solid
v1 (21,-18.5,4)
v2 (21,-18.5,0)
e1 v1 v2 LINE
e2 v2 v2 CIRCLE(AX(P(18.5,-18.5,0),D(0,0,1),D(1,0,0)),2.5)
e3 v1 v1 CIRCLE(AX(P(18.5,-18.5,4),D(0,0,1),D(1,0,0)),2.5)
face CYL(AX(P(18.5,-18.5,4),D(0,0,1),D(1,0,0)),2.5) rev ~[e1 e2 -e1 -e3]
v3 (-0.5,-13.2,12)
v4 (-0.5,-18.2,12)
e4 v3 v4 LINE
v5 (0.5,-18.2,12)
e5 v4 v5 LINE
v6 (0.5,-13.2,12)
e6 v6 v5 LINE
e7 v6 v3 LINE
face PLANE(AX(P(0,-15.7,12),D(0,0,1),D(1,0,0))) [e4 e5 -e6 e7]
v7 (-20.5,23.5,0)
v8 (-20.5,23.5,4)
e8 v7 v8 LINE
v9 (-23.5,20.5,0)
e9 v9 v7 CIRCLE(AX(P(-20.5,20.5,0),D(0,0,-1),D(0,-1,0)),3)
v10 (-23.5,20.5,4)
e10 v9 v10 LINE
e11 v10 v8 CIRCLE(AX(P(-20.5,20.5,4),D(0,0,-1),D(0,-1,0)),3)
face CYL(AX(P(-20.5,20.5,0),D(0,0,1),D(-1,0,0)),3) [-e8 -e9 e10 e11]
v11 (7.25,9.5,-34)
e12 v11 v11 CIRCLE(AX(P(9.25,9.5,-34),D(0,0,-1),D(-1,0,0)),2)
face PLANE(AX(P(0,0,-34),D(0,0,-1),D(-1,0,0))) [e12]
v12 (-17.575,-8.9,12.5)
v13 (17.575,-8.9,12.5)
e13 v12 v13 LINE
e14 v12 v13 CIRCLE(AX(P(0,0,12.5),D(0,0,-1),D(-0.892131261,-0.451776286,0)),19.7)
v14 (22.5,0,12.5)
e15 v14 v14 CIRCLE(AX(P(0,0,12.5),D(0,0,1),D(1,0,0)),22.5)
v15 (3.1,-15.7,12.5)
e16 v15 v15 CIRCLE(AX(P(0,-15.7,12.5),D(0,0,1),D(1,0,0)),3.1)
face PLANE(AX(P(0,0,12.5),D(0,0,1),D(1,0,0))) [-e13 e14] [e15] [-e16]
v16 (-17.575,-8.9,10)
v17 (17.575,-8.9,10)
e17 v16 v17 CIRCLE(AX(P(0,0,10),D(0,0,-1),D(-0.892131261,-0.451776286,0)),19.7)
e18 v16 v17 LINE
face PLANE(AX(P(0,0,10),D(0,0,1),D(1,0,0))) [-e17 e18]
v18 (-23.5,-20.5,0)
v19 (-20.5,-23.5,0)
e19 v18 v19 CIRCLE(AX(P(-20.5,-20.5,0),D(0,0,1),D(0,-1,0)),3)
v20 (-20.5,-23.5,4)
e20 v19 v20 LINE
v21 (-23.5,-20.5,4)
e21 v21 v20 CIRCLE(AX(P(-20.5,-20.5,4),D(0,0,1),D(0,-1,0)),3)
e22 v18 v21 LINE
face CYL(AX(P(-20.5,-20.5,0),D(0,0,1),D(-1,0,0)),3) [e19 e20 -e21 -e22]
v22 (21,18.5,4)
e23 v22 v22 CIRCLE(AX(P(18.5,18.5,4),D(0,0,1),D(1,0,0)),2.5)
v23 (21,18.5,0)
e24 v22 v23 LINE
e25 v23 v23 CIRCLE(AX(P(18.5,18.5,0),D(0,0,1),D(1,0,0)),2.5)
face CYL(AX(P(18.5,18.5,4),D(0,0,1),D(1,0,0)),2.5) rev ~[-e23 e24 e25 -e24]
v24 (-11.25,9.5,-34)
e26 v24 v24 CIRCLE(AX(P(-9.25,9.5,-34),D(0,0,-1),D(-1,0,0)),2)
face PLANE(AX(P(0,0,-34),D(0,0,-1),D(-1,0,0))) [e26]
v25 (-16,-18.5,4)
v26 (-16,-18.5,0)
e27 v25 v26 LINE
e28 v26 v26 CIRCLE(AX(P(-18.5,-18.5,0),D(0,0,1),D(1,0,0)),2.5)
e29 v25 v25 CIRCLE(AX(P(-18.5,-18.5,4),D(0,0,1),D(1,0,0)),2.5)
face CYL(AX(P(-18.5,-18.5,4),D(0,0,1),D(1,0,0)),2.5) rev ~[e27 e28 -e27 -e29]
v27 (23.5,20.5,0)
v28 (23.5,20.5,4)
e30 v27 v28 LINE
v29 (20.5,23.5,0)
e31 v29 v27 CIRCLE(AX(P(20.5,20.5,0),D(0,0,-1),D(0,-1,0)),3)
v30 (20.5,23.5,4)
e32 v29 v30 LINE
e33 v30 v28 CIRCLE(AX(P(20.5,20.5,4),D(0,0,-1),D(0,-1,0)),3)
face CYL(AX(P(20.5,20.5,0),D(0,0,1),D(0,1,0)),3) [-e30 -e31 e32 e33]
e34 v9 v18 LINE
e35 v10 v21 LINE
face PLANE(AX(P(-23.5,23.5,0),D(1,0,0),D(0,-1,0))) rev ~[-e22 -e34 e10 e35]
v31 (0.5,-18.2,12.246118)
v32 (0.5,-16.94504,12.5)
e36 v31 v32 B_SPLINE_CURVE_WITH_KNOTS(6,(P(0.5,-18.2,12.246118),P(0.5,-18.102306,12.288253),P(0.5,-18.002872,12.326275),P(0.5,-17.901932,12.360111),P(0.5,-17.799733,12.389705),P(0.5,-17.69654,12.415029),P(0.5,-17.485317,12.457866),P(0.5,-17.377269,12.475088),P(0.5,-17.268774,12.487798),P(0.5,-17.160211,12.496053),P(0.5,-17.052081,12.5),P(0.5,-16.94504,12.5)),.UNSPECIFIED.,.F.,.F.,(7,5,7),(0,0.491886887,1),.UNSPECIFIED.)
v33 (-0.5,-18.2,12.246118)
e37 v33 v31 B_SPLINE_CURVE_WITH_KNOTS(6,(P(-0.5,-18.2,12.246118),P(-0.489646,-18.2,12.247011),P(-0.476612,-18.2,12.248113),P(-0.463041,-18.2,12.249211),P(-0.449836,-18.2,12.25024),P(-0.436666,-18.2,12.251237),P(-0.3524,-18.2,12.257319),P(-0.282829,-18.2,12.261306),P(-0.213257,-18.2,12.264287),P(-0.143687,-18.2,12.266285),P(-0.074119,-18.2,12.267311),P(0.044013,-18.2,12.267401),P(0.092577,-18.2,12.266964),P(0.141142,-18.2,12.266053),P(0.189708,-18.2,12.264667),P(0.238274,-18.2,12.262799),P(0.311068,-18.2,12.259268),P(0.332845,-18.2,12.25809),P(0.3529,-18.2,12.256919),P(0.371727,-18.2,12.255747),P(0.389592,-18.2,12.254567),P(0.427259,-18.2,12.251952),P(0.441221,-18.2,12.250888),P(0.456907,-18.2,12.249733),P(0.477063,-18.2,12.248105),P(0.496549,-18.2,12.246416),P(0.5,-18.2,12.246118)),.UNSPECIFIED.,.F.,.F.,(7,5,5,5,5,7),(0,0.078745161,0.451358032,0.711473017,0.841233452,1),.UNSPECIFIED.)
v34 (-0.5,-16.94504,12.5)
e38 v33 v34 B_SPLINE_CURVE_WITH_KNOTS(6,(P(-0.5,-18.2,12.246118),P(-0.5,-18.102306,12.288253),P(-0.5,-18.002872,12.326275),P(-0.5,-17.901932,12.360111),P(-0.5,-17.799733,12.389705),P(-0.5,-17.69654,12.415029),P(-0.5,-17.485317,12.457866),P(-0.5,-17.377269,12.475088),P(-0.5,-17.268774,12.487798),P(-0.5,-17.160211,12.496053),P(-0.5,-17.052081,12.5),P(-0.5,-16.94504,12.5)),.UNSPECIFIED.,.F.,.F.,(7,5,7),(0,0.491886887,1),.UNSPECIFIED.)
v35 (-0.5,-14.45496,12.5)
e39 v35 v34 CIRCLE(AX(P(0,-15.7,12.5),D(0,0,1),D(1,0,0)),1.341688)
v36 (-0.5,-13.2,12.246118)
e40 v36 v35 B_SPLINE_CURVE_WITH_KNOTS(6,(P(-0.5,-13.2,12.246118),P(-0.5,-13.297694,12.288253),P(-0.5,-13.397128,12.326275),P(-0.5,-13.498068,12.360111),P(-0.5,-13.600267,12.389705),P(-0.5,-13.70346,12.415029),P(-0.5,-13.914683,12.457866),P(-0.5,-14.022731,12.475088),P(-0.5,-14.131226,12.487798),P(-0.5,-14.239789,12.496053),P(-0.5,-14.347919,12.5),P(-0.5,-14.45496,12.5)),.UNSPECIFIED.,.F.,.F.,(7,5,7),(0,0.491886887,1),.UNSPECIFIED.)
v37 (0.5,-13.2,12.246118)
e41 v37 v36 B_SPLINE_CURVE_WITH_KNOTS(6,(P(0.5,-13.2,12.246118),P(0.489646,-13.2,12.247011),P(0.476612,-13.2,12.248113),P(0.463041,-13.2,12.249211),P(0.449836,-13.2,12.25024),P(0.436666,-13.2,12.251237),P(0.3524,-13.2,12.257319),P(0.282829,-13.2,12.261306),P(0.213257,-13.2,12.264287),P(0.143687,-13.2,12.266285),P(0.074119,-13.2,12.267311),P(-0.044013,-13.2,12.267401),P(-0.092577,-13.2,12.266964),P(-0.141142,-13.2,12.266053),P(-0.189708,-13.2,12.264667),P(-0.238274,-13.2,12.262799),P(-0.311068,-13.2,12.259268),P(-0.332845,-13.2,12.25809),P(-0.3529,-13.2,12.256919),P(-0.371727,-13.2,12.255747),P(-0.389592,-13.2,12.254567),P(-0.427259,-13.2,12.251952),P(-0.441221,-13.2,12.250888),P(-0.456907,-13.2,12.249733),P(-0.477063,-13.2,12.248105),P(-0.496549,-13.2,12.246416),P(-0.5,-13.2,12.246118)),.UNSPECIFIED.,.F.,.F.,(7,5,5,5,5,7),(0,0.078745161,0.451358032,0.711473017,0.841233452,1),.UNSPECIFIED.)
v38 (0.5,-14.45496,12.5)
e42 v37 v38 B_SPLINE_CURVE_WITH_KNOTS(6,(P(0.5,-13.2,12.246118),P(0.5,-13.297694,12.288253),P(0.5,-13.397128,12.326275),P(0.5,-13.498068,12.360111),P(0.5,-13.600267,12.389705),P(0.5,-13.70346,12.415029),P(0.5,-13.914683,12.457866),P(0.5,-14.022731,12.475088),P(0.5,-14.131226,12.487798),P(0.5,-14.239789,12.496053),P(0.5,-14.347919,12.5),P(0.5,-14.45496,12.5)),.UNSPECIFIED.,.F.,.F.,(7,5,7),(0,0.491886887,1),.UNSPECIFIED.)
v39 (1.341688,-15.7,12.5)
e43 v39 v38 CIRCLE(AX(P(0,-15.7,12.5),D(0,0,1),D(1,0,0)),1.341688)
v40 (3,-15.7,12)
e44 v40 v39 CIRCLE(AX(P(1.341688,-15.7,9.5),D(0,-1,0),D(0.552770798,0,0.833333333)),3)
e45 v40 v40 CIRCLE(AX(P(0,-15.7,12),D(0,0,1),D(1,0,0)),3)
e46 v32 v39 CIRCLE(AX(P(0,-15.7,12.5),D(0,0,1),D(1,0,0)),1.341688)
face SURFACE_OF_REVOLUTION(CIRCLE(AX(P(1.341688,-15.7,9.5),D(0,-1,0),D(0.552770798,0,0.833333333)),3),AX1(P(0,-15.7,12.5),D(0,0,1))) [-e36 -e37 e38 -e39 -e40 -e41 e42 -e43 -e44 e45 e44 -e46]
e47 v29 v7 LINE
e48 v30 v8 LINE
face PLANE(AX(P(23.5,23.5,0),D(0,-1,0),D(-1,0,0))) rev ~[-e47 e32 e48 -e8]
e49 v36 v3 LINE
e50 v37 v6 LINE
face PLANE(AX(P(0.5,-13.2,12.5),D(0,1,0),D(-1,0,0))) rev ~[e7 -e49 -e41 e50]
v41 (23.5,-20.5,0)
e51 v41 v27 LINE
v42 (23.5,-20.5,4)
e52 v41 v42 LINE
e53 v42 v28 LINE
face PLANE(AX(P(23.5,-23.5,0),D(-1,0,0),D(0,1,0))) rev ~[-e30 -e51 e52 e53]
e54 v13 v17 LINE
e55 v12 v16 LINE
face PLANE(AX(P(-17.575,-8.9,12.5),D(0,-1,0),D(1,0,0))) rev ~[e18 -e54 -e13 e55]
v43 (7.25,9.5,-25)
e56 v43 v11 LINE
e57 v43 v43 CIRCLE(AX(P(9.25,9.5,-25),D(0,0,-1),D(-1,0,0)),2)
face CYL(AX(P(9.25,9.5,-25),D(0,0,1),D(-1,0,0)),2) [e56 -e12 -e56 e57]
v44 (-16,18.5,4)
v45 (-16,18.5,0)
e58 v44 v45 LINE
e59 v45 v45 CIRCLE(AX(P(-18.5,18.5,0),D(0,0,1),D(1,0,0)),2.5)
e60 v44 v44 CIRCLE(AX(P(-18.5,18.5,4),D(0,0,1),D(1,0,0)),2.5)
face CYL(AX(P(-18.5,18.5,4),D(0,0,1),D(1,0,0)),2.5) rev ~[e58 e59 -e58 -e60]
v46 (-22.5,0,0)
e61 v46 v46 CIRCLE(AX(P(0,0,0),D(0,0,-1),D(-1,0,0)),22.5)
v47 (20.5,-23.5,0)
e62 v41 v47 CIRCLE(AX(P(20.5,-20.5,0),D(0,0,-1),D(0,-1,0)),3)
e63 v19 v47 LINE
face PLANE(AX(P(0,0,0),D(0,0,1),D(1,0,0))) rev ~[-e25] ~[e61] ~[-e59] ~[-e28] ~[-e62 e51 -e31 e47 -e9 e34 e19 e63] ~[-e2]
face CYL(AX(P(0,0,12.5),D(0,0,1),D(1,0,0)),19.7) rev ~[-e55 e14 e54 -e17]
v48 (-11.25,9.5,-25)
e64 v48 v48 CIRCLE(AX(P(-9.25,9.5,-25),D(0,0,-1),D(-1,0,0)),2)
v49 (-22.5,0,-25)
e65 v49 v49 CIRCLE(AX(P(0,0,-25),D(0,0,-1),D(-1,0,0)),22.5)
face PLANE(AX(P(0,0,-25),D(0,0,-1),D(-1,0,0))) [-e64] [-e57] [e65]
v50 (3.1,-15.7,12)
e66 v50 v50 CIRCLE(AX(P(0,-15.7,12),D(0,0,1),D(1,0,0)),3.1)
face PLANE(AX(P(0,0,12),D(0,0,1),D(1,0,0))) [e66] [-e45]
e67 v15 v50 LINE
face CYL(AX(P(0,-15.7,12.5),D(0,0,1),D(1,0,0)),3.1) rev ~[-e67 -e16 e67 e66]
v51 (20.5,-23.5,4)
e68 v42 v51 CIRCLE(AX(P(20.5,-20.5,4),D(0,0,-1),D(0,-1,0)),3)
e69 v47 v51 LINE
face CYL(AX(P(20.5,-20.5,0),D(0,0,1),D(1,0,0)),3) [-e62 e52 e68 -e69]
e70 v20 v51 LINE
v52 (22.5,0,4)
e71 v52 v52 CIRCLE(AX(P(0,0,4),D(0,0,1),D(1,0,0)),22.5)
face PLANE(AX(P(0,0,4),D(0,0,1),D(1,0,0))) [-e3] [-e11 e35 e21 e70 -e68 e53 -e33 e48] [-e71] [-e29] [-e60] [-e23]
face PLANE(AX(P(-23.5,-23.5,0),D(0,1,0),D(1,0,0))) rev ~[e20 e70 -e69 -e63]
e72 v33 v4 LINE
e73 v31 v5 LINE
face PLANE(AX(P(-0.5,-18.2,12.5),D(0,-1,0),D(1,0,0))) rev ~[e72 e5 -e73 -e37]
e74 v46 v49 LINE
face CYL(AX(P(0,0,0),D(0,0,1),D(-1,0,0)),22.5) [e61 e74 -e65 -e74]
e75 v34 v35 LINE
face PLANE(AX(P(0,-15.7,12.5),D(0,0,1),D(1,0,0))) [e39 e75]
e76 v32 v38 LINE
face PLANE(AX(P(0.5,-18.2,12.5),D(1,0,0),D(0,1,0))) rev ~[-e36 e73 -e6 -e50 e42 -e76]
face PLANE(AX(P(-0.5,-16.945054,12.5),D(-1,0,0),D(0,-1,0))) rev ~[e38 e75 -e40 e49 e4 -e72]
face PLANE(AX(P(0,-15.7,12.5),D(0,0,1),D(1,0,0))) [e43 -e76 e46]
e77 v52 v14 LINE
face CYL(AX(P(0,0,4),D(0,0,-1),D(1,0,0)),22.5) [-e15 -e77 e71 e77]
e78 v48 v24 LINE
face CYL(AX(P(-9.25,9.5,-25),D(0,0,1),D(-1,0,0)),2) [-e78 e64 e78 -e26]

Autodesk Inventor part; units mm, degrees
ref_plane "YZ Plane" through (0, 0, 0) normal (1, 0, 0) x (0, 1, 0)
ref_plane "XZ Plane" through (0, 0, 0) normal (0, 1, 0) x (-1, 0, 0)
ref_plane "XY Plane" through (0, 0, 0) normal (0, 0, 1) x (1, 0, 0)
sketch "Base" plane through (0, 0, 0) normal (0, 0, 1) x (1, 0, 0)
  line L0 (-23.5, -23.5) -> (23.5, -23.5)
  line L1 (23.5, -23.5) -> (23.5, 23.5)
  line L2 (23.5, 23.5) -> (-23.5, 23.5)
  line L3 (-23.5, 23.5) -> (-23.5, -23.5)
  line L4 (-23.5, -23.5) -> (23.5, 23.5) construction
  line L5 (23.5, -23.5) -> (-23.5, 23.5) construction
  point P0 (0, 0)
  dimension "d0" = 47
extrude "BaseFeature" add sketch "Base" along normal blind 4
fillet "FilletsFeature" radius 3 4 edges at (-23.5, -23.5, 2) (-23.5, 23.5, 2) (23.5, -23.5, 2) (23.5, 23.5, 2)
sketch "Front" plane through (0, 0, 4) normal (0, 0, 1) x (1, 0, 0)
  circle A0 centre (0, 0) radius 22.5
  dimension "d4" = 45
extrude "FrontFeature" add sketch "Front" along normal blind 8.5
sketch "Screen" plane through (0, 0, 12.5) normal (0, 0, 1) x (1, 0, 0)
  circle A0 centre (0, 0) radius 19.7
  circle A1 centre (0, 0) radius 22.5 projected
  line L0 (-17.575, -8.9) -> (17.575, -8.9)
  line L1 (0, -8.9) -> (0, -19.7) construction
  dimension "d7" = 2.8
  dimension "d8" = 10.8
extrude "ScreenFEature" cut sketch "Screen" against normal blind 2.5 contours A0 L0 picked at (4.7799, 0.8366)
sketch "ScrewHole" plane through (0, 0, 12.5) normal (0, 0, 1) x (1, 0, 0)
  line L0 (17.575, -8.9) -> (-17.575, -8.9) projected
  line L1 (0, -8.9) -> (0, -22.5) construction
  circle A0 centre (0, 0) radius 22.5 projected
  circle A1 centre (0, -15.7) radius 3
  circle A2 centre (0, -15.7) radius 3.1
  dimension "d11" = 6
  dimension "d12" = 0.1
extrude "ScrewHoleFeature" cut sketch "ScrewHole" against normal blind 0.5 contours A1 | A2
sketch "ScrewHead" plane through (0, -15.7, 12) normal (0, 0, 1) x (1, 0, 0)
  circle A0 centre (0, 0) radius 3
  circle A1 centre (0, 0) radius 3.1 projected
  point P0 (0, 15.7)
  dimension "d15" = 6
extrude "ScrewHeadFeature" add sketch "ScrewHead" along normal blind 0.5 contours A0
fillet "ScrewHeadFilletFeature" radius 3 1 edges at (-3, -15.7, 12.5)
sketch "ScrewFlat" plane through (0, -15.7, 12.5) normal (0, 0, 1) x (1, 0, 0)
  circle A0 centre (0, 0) radius 3 projected
  line L0 (0, 3) -> (0, -3) construction
  line L1 (-0.5, -2.5) -> (0.5, -2.5)
  line L2 (0.5, -2.5) -> (0.5, 2.5)
  line L3 (0.5, 2.5) -> (-0.5, 2.5)
  line L4 (-0.5, 2.5) -> (-0.5, -2.5)
  circle A1 centre (0, 0) radius 1.3417 projected
  line L5 (-0.5, -2.5) -> (0.5, 2.5) construction
  line L6 (0.5, -2.5) -> (-0.5, 2.5) construction
  point P0 (0, 15.7)
  dimension "d19" = 5
  dimension "d20" = 1
extrude "ScrewFlatFeature" cut sketch "ScrewFlat" against normal blind 0.5 contours L4 A1 L2 L1 | L4 A1 L2 | L4 L3 L2 A1
sketch "MountHoles" plane through (0, 0, 4) normal (0, 0, 1) x (1, 0, 0)
  circle A0 centre (-18.5, -18.5) radius 2.5
  line L0 (-32.9, 0) -> (32.9, 0) projected
  line L1 (0, -32.9) -> (0, 32.9) projected
  circle A1 centre (18.5, -18.5) radius 2.5
  circle A2 centre (-18.5, 18.5) radius 2.5
  circle A3 centre (18.5, 18.5) radius 2.5
  point P0 (0, 0)
  dimension "d23" = 5
  dimension "d24" = 37
  dimension "d25" = 37
extrude "MountHolesFeature" cut sketch "MountHoles" against normal through all
sketch "Body" plane through (0, 0, 0) normal (0, 0, -1) x (-1, 0, 0)
  circle A0 centre (0, 0) radius 22.5 projected
extrude "BodyFeature" add sketch "Body" along normal blind 25
sketch "Studs" plane through (0, 0, -25) normal (0, 0, -1) x (-1, 0, 0)
  circle A0 centre (0, 0) radius 22.5 projected
  line L0 (-21.2132, 7.5) -> (21.2132, 7.5) construction
  circle A1 centre (9.25, 9.5) radius 2
  line L1 (0, -32.9) -> (0, 32.9) construction
  circle A2 centre (-9.25, 9.5) radius 2
  line L2 (9.25, 9.5) -> (9.25, 7.5) construction
  line L3 (-9.25, 9.5) -> (-11.25, 9.5) construction
  line L4 (9.25, 9.5) -> (11.25, 9.5) construction
  point P0 (0, 22.5)
  dimension "d32" = 4
  dimension "d30" = 15
  dimension "d31" = 22.5
extrude "StudsFeature" add sketch "Studs" along normal blind 9 contours A1 | A2
equation "\"d25\" = d24"
properties part number "BaomanACPanelMountMeter"
